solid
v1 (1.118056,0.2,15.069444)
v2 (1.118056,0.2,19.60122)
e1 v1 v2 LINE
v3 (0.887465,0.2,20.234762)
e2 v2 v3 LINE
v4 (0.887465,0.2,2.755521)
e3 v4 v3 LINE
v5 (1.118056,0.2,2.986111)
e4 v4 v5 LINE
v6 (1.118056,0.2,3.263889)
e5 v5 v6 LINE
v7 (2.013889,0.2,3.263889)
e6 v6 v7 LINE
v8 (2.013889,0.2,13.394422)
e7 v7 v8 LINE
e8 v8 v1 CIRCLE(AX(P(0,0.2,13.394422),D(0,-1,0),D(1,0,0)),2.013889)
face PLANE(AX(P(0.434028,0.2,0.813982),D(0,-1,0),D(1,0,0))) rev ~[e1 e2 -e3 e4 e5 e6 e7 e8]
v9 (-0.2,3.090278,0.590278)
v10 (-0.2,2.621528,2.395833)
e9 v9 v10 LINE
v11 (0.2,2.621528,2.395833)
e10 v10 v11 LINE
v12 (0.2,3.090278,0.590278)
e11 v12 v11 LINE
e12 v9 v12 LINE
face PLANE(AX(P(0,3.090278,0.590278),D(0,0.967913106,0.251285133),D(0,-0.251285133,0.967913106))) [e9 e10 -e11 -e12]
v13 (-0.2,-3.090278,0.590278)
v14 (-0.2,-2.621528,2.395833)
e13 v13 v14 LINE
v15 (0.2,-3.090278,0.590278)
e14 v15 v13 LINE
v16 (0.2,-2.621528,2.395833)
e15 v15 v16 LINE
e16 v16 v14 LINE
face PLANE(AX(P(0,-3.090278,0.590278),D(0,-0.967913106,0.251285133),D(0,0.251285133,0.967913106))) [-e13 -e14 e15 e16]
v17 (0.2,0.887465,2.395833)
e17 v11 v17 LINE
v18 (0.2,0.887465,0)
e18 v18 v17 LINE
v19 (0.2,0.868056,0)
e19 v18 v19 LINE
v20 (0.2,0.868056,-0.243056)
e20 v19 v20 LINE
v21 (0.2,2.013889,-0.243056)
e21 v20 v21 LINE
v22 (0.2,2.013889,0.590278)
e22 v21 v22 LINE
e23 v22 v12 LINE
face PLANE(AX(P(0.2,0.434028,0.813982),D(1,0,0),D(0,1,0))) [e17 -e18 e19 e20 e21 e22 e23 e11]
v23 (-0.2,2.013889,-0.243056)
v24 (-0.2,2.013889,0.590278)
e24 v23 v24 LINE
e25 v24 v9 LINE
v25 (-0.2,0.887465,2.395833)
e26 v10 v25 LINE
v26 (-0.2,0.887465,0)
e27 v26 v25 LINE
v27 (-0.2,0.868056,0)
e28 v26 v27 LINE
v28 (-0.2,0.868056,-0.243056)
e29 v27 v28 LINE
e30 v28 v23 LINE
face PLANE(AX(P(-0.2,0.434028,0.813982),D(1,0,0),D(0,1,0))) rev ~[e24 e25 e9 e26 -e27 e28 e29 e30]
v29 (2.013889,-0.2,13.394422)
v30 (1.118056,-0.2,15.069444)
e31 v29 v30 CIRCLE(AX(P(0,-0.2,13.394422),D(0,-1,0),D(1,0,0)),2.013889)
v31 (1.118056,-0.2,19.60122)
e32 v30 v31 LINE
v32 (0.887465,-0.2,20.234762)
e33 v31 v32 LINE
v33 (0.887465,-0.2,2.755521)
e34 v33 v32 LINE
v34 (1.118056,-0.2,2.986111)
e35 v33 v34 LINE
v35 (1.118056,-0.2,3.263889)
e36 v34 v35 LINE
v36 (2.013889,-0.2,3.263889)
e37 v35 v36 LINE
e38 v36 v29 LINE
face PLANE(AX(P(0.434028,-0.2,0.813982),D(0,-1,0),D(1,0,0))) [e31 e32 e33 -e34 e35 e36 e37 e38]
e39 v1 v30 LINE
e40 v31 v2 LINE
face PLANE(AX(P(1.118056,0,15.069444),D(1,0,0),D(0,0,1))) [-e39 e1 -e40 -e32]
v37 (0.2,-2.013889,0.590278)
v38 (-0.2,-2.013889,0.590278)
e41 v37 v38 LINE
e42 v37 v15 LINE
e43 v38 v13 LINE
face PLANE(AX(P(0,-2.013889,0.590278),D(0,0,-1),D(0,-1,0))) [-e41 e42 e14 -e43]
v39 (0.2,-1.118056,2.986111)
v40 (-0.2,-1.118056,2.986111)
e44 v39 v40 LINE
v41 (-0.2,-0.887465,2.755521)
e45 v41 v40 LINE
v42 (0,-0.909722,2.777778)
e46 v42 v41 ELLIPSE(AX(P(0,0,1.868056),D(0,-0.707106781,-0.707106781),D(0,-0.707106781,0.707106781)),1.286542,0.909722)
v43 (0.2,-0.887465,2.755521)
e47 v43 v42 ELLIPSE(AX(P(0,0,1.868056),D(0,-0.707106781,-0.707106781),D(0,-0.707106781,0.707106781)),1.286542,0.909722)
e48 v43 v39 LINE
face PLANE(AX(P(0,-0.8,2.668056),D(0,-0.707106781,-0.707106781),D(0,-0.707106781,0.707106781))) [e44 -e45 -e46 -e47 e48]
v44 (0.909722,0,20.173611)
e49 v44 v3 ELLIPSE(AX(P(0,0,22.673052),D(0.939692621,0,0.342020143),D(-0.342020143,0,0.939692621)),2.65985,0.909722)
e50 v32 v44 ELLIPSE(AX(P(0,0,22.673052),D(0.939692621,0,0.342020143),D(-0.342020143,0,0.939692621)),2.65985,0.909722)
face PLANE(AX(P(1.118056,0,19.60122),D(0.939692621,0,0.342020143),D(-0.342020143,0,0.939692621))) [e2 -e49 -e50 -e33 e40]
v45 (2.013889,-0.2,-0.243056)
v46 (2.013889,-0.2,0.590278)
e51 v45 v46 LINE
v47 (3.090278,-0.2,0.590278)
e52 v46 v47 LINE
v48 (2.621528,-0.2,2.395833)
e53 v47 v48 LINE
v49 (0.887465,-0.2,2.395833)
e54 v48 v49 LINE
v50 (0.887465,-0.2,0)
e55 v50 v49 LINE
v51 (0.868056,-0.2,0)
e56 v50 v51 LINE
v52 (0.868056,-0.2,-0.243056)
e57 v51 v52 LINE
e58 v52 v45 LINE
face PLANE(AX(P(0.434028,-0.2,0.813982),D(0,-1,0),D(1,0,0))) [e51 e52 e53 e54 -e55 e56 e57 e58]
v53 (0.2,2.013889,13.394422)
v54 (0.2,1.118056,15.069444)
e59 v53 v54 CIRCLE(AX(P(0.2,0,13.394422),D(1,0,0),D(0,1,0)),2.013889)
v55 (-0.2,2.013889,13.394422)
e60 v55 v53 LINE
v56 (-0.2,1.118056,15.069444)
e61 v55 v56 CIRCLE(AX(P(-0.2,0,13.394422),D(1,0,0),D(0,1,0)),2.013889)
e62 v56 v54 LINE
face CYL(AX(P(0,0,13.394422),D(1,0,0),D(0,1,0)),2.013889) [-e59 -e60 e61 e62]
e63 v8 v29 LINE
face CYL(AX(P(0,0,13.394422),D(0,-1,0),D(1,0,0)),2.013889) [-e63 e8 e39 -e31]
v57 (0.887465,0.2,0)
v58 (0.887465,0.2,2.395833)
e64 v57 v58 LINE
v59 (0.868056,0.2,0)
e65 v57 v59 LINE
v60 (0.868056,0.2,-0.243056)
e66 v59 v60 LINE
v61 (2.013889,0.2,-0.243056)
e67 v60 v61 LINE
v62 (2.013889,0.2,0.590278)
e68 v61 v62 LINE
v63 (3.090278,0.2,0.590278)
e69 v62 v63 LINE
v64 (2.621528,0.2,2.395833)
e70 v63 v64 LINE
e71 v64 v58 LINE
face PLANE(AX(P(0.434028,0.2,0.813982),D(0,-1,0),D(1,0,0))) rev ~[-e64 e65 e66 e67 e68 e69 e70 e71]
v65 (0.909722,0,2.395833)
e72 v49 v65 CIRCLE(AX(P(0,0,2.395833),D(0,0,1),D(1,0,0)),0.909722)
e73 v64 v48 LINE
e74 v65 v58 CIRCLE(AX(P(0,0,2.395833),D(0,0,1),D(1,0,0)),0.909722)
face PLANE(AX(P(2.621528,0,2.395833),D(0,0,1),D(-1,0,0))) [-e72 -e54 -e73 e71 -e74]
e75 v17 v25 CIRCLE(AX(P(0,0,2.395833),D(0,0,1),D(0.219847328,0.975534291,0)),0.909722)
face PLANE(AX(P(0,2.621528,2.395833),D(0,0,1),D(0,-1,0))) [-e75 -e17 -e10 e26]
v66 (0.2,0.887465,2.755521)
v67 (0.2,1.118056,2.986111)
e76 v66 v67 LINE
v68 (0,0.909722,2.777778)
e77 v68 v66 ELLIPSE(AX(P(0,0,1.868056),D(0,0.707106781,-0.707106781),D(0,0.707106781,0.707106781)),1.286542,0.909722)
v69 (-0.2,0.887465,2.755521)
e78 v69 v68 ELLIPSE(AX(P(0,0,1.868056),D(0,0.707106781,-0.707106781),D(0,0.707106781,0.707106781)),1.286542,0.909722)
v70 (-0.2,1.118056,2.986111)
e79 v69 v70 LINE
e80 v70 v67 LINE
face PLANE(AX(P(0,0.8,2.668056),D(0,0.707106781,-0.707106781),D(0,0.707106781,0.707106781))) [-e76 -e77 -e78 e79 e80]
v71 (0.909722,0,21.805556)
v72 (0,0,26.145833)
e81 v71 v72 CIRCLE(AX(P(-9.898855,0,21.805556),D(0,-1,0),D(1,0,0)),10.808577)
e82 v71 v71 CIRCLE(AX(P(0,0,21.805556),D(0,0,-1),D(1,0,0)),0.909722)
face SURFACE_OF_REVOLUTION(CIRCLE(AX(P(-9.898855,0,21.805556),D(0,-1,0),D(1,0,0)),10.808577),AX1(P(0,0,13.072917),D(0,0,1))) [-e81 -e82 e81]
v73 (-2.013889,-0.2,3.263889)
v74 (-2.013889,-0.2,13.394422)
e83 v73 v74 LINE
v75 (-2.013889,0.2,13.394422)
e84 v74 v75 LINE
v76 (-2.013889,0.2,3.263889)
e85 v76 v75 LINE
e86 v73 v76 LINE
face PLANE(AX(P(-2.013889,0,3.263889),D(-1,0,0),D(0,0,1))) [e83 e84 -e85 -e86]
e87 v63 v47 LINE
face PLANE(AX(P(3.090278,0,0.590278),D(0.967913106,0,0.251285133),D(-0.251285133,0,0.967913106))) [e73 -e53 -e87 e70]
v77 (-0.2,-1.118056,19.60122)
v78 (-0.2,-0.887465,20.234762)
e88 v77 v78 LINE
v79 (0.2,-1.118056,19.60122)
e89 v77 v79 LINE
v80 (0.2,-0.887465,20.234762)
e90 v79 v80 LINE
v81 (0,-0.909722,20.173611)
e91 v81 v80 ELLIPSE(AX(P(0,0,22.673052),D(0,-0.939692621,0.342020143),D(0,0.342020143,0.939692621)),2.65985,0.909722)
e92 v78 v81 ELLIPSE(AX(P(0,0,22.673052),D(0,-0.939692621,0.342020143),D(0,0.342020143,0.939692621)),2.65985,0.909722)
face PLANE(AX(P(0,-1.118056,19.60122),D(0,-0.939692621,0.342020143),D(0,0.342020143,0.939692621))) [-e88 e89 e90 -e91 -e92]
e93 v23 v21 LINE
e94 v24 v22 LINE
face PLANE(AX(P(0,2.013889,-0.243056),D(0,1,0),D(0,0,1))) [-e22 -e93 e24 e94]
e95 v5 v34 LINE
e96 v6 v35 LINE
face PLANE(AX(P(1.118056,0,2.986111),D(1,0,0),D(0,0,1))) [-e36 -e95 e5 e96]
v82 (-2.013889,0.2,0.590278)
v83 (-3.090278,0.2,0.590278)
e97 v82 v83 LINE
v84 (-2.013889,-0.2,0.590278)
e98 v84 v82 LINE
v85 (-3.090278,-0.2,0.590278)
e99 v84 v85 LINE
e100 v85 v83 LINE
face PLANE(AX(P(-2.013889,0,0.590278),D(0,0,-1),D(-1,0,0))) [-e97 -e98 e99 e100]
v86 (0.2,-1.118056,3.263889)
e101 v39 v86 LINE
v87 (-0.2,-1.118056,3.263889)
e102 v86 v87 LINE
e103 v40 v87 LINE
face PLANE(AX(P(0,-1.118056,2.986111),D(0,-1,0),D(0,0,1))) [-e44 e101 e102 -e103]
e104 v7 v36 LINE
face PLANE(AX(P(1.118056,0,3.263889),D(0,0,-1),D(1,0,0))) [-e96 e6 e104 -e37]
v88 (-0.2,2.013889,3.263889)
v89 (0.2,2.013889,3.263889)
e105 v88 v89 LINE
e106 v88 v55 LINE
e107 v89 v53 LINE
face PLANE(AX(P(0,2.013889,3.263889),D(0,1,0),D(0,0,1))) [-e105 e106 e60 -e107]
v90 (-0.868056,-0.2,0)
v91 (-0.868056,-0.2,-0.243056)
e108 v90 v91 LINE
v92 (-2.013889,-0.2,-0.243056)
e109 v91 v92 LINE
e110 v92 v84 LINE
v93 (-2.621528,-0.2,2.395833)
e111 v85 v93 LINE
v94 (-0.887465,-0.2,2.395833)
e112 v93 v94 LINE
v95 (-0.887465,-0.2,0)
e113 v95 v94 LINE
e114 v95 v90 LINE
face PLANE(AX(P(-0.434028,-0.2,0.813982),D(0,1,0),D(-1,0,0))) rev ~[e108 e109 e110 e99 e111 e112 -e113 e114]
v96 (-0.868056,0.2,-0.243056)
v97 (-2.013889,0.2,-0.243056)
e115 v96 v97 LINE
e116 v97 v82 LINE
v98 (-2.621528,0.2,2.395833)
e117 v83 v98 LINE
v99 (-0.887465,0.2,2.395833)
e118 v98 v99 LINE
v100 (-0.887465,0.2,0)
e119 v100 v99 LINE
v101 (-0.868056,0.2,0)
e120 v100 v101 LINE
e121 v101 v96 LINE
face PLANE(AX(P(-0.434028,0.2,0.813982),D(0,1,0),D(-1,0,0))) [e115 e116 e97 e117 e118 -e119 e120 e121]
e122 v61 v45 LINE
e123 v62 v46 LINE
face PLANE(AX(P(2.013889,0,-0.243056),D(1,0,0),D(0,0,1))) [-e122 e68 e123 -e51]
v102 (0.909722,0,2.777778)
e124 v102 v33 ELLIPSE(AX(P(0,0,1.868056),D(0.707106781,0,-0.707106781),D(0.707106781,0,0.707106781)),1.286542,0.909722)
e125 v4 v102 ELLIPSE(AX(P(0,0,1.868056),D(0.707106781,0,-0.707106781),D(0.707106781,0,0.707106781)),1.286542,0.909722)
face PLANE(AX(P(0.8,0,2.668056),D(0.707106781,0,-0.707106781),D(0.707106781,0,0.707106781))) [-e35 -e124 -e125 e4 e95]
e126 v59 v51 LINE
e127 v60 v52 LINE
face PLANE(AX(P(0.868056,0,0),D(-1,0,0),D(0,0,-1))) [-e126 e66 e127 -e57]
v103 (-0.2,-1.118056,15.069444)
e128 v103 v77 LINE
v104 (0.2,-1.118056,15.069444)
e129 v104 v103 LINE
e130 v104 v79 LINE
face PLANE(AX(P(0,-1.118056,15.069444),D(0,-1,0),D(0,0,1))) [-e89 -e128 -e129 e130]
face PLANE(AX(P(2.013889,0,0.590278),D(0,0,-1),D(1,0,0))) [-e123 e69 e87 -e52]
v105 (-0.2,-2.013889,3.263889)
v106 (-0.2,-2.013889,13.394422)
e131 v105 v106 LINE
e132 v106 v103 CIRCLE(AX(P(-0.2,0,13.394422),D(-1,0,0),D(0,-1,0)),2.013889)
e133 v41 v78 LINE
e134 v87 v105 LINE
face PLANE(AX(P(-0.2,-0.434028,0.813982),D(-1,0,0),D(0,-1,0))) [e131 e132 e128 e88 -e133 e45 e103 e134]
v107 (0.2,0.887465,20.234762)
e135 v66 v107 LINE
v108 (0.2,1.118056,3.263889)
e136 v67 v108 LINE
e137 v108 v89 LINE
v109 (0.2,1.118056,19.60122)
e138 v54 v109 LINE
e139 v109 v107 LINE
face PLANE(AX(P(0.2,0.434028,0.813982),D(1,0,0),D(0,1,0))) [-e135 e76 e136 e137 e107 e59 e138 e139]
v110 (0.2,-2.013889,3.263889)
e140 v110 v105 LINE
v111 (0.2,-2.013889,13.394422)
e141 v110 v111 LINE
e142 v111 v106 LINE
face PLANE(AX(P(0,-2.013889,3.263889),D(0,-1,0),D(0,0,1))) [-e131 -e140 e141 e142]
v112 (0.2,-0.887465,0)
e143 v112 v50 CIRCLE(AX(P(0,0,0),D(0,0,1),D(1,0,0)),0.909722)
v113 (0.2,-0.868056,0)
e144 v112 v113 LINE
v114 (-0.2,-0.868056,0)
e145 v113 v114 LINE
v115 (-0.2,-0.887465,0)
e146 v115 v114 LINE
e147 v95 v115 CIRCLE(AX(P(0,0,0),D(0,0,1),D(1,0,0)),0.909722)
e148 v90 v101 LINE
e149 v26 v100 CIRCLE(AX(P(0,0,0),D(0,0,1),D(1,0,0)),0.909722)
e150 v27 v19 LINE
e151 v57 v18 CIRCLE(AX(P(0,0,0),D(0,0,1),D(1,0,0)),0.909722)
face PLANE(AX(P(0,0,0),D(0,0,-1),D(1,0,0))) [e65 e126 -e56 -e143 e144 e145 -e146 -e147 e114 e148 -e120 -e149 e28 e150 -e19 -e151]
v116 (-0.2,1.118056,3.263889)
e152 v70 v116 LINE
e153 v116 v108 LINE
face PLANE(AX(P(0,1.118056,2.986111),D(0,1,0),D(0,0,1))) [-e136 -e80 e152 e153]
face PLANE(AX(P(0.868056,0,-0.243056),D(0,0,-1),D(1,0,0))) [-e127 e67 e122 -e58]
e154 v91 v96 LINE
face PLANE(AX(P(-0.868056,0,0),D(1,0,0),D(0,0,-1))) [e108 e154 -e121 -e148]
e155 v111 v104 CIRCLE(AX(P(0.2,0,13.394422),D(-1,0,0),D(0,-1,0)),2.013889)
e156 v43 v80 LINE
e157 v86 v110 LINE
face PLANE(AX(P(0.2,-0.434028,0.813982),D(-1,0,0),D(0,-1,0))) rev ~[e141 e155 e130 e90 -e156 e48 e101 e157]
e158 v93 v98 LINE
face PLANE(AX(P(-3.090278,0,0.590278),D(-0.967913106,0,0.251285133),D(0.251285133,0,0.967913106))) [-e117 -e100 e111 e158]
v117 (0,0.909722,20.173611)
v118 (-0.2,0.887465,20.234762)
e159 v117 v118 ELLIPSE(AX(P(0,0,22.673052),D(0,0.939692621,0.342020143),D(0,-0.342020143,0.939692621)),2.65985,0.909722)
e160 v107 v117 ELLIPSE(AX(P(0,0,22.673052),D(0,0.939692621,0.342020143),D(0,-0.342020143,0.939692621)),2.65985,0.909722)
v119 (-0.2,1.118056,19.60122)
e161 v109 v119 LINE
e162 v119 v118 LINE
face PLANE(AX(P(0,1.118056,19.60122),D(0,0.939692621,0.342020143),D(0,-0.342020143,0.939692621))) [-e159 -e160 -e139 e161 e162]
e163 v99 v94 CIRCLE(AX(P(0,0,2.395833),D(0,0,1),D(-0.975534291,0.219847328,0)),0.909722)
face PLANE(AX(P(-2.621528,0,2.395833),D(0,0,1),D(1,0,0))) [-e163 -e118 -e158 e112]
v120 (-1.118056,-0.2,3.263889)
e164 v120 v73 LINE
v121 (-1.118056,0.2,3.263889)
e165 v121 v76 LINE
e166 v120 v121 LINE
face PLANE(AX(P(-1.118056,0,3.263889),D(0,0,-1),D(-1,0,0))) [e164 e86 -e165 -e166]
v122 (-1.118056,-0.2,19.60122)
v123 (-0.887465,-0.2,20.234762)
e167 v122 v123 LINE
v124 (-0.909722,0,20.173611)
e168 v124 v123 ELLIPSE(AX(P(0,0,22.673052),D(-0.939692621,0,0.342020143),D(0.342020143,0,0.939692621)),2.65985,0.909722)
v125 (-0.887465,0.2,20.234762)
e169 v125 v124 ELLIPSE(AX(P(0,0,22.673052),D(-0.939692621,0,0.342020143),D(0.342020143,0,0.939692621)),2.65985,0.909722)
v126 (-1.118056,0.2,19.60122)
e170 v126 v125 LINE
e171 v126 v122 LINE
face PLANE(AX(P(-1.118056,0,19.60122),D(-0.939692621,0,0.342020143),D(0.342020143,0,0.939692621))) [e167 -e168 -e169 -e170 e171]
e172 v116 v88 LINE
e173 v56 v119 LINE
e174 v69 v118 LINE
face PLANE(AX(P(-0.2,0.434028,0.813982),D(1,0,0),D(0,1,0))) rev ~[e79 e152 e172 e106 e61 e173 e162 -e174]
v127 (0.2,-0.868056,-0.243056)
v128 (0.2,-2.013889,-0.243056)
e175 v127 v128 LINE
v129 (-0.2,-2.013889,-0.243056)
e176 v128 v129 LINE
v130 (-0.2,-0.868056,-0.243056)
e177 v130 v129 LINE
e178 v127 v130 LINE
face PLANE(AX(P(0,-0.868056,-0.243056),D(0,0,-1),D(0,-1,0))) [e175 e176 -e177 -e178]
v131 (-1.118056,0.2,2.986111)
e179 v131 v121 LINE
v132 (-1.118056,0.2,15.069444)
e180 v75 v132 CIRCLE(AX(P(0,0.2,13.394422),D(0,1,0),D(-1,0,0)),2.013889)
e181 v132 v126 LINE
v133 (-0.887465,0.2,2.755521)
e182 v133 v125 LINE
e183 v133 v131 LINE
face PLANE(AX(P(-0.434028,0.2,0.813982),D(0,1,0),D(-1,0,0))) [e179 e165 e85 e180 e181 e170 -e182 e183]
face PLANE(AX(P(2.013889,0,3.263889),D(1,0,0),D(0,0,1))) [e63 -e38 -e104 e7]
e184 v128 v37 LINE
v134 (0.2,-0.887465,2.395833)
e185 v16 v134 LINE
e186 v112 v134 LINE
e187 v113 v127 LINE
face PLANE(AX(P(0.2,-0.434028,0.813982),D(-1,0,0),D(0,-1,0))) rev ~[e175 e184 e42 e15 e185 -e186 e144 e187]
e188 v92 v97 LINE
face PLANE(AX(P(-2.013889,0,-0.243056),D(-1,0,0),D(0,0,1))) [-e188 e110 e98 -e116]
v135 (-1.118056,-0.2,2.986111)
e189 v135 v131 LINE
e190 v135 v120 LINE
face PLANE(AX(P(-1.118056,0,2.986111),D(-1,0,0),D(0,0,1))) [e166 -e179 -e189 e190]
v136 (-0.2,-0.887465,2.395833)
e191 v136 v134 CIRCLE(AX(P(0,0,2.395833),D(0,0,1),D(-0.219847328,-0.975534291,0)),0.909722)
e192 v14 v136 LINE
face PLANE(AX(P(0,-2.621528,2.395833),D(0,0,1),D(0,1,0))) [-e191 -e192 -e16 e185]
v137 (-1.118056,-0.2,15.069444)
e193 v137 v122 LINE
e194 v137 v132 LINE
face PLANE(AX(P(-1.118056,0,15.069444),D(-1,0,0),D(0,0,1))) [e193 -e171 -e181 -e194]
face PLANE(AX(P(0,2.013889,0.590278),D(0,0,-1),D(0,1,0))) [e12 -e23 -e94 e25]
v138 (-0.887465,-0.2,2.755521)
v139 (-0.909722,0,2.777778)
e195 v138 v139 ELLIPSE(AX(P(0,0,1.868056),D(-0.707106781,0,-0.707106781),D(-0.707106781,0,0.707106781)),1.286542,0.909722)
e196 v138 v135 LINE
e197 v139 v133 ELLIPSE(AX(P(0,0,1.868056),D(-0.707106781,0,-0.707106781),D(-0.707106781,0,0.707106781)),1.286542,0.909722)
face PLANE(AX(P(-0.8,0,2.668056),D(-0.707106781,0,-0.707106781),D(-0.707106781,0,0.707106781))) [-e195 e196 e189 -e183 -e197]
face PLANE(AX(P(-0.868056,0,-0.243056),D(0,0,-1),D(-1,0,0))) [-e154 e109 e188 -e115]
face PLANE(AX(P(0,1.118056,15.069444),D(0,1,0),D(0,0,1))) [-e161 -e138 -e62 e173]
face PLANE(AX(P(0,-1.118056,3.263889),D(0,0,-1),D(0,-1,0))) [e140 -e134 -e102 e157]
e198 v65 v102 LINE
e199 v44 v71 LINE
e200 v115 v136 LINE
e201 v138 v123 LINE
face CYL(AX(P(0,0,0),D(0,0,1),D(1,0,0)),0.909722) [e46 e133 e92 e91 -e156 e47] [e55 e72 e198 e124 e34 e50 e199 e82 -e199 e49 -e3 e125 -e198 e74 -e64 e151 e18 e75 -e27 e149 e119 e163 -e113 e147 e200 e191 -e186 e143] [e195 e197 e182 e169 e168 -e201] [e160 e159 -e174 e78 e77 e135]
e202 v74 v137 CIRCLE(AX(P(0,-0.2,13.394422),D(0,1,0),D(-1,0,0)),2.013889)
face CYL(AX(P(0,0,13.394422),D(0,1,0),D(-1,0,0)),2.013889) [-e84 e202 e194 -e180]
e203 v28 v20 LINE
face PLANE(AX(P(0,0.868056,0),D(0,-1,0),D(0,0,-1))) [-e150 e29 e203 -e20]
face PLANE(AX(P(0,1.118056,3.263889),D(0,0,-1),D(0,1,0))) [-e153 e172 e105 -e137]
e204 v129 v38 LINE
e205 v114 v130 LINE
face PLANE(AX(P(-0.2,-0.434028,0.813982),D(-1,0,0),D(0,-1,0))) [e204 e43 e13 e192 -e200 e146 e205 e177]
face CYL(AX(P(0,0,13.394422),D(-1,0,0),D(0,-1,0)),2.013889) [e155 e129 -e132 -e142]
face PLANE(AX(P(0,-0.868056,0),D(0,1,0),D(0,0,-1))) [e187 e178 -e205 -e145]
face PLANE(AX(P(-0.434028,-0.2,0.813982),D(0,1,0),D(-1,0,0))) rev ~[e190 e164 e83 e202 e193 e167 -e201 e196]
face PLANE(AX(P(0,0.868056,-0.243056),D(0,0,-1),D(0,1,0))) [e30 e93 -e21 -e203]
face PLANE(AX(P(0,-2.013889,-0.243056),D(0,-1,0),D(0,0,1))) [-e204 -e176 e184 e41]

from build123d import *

# Parameters (mm, degrees)
F2_W     = 0.8680555556
F2_H     = 1.6279645497
F3_DEPTH = 0.2
F4_COUNT = 4


# Not quite as in the source:
# - a feature names something its author has since deleted; it is built from what else it names


with BuildPart() as f1:
    # F0 (on Front) → F1 (revolve)
    with BuildSketch(Plane.XZ):
        with BuildLine():
            Line((0, 26.1458333333), (0, 0))
            Line((0, 0), (0.9097222222, 0))
            Line((0.9097222222, 0), (0.9097222222, 21.8055555556))
            ThreePointArc((0.9097222222, 21.8055555556), (0.6798471947, 24.0228515276), (0, 26.1458333333))
        make_face()
    revolve(axis=Axis((0, 0, 13.0729166667), (0, 0, 1)))

    # F2 (on Front) → F3 (join, symmetric)
    with BuildSketch(Plane.XZ):
        with Locations((0.4340277778, 0.8139822748)):
            Rectangle(F2_W, F2_H)
        with BuildLine():
            Line((0, 22.6730523746), (0, 1.6279645497))
            Line((0, 1.6279645497), (0.8680555556, 1.6279645497))
            Line((0.8680555556, 1.6279645497), (0.8680555556, 0))
            Line((0.8680555556, 0), (0.8680555556, -0.2430555556))
            Line((0.8680555556, -0.2430555556), (2.0138888889, -0.2430555556))
            Line((2.0138888889, -0.2430555556), (2.0138888889, 0.5902777778))
            Line((2.0138888889, 0.5902777778), (3.0902777778, 0.5902777778))
            Line((3.0902777778, 0.5902777778), (2.6215277778, 2.3958333333))
            Line((2.6215277778, 2.3958333333), (0.8, 2.3958333333))
            Line((0.8, 2.3958333333), (0.8, 2.6680555556))
            Line((0.8, 2.6680555556), (1.1180555556, 2.9861111111))
            Line((1.1180555556, 2.9861111111), (1.1180555556, 3.2638888889))
            Line((1.1180555556, 3.2638888889), (2.0138888889, 3.2638888889))
            Line((2.0138888889, 3.2638888889), (2.0138888889, 13.3944219874))
            ThreePointArc((2.0138888889, 13.3944219874), (1.7758643131, 14.3441874312), (1.1180555556, 15.0694444444))
            Line((1.1180555556, 15.0694444444), (1.1180555556, 19.6012199821))
            Line((1.1180555556, 19.6012199821), (0, 22.6730523746))
        make_face()
    extrude(amount=F3_DEPTH, both=True)

    # F4: F1 ×4 about axis
    f4_axis = Axis((0, 0, 0), (0, 0, 1))


with BuildPart() as f1_1:
    add(f1.part)
    for i in range(1, F4_COUNT):
        add(f1.part.rotate(f4_axis, i * 360 / F4_COUNT))


solid = f1_1.part
